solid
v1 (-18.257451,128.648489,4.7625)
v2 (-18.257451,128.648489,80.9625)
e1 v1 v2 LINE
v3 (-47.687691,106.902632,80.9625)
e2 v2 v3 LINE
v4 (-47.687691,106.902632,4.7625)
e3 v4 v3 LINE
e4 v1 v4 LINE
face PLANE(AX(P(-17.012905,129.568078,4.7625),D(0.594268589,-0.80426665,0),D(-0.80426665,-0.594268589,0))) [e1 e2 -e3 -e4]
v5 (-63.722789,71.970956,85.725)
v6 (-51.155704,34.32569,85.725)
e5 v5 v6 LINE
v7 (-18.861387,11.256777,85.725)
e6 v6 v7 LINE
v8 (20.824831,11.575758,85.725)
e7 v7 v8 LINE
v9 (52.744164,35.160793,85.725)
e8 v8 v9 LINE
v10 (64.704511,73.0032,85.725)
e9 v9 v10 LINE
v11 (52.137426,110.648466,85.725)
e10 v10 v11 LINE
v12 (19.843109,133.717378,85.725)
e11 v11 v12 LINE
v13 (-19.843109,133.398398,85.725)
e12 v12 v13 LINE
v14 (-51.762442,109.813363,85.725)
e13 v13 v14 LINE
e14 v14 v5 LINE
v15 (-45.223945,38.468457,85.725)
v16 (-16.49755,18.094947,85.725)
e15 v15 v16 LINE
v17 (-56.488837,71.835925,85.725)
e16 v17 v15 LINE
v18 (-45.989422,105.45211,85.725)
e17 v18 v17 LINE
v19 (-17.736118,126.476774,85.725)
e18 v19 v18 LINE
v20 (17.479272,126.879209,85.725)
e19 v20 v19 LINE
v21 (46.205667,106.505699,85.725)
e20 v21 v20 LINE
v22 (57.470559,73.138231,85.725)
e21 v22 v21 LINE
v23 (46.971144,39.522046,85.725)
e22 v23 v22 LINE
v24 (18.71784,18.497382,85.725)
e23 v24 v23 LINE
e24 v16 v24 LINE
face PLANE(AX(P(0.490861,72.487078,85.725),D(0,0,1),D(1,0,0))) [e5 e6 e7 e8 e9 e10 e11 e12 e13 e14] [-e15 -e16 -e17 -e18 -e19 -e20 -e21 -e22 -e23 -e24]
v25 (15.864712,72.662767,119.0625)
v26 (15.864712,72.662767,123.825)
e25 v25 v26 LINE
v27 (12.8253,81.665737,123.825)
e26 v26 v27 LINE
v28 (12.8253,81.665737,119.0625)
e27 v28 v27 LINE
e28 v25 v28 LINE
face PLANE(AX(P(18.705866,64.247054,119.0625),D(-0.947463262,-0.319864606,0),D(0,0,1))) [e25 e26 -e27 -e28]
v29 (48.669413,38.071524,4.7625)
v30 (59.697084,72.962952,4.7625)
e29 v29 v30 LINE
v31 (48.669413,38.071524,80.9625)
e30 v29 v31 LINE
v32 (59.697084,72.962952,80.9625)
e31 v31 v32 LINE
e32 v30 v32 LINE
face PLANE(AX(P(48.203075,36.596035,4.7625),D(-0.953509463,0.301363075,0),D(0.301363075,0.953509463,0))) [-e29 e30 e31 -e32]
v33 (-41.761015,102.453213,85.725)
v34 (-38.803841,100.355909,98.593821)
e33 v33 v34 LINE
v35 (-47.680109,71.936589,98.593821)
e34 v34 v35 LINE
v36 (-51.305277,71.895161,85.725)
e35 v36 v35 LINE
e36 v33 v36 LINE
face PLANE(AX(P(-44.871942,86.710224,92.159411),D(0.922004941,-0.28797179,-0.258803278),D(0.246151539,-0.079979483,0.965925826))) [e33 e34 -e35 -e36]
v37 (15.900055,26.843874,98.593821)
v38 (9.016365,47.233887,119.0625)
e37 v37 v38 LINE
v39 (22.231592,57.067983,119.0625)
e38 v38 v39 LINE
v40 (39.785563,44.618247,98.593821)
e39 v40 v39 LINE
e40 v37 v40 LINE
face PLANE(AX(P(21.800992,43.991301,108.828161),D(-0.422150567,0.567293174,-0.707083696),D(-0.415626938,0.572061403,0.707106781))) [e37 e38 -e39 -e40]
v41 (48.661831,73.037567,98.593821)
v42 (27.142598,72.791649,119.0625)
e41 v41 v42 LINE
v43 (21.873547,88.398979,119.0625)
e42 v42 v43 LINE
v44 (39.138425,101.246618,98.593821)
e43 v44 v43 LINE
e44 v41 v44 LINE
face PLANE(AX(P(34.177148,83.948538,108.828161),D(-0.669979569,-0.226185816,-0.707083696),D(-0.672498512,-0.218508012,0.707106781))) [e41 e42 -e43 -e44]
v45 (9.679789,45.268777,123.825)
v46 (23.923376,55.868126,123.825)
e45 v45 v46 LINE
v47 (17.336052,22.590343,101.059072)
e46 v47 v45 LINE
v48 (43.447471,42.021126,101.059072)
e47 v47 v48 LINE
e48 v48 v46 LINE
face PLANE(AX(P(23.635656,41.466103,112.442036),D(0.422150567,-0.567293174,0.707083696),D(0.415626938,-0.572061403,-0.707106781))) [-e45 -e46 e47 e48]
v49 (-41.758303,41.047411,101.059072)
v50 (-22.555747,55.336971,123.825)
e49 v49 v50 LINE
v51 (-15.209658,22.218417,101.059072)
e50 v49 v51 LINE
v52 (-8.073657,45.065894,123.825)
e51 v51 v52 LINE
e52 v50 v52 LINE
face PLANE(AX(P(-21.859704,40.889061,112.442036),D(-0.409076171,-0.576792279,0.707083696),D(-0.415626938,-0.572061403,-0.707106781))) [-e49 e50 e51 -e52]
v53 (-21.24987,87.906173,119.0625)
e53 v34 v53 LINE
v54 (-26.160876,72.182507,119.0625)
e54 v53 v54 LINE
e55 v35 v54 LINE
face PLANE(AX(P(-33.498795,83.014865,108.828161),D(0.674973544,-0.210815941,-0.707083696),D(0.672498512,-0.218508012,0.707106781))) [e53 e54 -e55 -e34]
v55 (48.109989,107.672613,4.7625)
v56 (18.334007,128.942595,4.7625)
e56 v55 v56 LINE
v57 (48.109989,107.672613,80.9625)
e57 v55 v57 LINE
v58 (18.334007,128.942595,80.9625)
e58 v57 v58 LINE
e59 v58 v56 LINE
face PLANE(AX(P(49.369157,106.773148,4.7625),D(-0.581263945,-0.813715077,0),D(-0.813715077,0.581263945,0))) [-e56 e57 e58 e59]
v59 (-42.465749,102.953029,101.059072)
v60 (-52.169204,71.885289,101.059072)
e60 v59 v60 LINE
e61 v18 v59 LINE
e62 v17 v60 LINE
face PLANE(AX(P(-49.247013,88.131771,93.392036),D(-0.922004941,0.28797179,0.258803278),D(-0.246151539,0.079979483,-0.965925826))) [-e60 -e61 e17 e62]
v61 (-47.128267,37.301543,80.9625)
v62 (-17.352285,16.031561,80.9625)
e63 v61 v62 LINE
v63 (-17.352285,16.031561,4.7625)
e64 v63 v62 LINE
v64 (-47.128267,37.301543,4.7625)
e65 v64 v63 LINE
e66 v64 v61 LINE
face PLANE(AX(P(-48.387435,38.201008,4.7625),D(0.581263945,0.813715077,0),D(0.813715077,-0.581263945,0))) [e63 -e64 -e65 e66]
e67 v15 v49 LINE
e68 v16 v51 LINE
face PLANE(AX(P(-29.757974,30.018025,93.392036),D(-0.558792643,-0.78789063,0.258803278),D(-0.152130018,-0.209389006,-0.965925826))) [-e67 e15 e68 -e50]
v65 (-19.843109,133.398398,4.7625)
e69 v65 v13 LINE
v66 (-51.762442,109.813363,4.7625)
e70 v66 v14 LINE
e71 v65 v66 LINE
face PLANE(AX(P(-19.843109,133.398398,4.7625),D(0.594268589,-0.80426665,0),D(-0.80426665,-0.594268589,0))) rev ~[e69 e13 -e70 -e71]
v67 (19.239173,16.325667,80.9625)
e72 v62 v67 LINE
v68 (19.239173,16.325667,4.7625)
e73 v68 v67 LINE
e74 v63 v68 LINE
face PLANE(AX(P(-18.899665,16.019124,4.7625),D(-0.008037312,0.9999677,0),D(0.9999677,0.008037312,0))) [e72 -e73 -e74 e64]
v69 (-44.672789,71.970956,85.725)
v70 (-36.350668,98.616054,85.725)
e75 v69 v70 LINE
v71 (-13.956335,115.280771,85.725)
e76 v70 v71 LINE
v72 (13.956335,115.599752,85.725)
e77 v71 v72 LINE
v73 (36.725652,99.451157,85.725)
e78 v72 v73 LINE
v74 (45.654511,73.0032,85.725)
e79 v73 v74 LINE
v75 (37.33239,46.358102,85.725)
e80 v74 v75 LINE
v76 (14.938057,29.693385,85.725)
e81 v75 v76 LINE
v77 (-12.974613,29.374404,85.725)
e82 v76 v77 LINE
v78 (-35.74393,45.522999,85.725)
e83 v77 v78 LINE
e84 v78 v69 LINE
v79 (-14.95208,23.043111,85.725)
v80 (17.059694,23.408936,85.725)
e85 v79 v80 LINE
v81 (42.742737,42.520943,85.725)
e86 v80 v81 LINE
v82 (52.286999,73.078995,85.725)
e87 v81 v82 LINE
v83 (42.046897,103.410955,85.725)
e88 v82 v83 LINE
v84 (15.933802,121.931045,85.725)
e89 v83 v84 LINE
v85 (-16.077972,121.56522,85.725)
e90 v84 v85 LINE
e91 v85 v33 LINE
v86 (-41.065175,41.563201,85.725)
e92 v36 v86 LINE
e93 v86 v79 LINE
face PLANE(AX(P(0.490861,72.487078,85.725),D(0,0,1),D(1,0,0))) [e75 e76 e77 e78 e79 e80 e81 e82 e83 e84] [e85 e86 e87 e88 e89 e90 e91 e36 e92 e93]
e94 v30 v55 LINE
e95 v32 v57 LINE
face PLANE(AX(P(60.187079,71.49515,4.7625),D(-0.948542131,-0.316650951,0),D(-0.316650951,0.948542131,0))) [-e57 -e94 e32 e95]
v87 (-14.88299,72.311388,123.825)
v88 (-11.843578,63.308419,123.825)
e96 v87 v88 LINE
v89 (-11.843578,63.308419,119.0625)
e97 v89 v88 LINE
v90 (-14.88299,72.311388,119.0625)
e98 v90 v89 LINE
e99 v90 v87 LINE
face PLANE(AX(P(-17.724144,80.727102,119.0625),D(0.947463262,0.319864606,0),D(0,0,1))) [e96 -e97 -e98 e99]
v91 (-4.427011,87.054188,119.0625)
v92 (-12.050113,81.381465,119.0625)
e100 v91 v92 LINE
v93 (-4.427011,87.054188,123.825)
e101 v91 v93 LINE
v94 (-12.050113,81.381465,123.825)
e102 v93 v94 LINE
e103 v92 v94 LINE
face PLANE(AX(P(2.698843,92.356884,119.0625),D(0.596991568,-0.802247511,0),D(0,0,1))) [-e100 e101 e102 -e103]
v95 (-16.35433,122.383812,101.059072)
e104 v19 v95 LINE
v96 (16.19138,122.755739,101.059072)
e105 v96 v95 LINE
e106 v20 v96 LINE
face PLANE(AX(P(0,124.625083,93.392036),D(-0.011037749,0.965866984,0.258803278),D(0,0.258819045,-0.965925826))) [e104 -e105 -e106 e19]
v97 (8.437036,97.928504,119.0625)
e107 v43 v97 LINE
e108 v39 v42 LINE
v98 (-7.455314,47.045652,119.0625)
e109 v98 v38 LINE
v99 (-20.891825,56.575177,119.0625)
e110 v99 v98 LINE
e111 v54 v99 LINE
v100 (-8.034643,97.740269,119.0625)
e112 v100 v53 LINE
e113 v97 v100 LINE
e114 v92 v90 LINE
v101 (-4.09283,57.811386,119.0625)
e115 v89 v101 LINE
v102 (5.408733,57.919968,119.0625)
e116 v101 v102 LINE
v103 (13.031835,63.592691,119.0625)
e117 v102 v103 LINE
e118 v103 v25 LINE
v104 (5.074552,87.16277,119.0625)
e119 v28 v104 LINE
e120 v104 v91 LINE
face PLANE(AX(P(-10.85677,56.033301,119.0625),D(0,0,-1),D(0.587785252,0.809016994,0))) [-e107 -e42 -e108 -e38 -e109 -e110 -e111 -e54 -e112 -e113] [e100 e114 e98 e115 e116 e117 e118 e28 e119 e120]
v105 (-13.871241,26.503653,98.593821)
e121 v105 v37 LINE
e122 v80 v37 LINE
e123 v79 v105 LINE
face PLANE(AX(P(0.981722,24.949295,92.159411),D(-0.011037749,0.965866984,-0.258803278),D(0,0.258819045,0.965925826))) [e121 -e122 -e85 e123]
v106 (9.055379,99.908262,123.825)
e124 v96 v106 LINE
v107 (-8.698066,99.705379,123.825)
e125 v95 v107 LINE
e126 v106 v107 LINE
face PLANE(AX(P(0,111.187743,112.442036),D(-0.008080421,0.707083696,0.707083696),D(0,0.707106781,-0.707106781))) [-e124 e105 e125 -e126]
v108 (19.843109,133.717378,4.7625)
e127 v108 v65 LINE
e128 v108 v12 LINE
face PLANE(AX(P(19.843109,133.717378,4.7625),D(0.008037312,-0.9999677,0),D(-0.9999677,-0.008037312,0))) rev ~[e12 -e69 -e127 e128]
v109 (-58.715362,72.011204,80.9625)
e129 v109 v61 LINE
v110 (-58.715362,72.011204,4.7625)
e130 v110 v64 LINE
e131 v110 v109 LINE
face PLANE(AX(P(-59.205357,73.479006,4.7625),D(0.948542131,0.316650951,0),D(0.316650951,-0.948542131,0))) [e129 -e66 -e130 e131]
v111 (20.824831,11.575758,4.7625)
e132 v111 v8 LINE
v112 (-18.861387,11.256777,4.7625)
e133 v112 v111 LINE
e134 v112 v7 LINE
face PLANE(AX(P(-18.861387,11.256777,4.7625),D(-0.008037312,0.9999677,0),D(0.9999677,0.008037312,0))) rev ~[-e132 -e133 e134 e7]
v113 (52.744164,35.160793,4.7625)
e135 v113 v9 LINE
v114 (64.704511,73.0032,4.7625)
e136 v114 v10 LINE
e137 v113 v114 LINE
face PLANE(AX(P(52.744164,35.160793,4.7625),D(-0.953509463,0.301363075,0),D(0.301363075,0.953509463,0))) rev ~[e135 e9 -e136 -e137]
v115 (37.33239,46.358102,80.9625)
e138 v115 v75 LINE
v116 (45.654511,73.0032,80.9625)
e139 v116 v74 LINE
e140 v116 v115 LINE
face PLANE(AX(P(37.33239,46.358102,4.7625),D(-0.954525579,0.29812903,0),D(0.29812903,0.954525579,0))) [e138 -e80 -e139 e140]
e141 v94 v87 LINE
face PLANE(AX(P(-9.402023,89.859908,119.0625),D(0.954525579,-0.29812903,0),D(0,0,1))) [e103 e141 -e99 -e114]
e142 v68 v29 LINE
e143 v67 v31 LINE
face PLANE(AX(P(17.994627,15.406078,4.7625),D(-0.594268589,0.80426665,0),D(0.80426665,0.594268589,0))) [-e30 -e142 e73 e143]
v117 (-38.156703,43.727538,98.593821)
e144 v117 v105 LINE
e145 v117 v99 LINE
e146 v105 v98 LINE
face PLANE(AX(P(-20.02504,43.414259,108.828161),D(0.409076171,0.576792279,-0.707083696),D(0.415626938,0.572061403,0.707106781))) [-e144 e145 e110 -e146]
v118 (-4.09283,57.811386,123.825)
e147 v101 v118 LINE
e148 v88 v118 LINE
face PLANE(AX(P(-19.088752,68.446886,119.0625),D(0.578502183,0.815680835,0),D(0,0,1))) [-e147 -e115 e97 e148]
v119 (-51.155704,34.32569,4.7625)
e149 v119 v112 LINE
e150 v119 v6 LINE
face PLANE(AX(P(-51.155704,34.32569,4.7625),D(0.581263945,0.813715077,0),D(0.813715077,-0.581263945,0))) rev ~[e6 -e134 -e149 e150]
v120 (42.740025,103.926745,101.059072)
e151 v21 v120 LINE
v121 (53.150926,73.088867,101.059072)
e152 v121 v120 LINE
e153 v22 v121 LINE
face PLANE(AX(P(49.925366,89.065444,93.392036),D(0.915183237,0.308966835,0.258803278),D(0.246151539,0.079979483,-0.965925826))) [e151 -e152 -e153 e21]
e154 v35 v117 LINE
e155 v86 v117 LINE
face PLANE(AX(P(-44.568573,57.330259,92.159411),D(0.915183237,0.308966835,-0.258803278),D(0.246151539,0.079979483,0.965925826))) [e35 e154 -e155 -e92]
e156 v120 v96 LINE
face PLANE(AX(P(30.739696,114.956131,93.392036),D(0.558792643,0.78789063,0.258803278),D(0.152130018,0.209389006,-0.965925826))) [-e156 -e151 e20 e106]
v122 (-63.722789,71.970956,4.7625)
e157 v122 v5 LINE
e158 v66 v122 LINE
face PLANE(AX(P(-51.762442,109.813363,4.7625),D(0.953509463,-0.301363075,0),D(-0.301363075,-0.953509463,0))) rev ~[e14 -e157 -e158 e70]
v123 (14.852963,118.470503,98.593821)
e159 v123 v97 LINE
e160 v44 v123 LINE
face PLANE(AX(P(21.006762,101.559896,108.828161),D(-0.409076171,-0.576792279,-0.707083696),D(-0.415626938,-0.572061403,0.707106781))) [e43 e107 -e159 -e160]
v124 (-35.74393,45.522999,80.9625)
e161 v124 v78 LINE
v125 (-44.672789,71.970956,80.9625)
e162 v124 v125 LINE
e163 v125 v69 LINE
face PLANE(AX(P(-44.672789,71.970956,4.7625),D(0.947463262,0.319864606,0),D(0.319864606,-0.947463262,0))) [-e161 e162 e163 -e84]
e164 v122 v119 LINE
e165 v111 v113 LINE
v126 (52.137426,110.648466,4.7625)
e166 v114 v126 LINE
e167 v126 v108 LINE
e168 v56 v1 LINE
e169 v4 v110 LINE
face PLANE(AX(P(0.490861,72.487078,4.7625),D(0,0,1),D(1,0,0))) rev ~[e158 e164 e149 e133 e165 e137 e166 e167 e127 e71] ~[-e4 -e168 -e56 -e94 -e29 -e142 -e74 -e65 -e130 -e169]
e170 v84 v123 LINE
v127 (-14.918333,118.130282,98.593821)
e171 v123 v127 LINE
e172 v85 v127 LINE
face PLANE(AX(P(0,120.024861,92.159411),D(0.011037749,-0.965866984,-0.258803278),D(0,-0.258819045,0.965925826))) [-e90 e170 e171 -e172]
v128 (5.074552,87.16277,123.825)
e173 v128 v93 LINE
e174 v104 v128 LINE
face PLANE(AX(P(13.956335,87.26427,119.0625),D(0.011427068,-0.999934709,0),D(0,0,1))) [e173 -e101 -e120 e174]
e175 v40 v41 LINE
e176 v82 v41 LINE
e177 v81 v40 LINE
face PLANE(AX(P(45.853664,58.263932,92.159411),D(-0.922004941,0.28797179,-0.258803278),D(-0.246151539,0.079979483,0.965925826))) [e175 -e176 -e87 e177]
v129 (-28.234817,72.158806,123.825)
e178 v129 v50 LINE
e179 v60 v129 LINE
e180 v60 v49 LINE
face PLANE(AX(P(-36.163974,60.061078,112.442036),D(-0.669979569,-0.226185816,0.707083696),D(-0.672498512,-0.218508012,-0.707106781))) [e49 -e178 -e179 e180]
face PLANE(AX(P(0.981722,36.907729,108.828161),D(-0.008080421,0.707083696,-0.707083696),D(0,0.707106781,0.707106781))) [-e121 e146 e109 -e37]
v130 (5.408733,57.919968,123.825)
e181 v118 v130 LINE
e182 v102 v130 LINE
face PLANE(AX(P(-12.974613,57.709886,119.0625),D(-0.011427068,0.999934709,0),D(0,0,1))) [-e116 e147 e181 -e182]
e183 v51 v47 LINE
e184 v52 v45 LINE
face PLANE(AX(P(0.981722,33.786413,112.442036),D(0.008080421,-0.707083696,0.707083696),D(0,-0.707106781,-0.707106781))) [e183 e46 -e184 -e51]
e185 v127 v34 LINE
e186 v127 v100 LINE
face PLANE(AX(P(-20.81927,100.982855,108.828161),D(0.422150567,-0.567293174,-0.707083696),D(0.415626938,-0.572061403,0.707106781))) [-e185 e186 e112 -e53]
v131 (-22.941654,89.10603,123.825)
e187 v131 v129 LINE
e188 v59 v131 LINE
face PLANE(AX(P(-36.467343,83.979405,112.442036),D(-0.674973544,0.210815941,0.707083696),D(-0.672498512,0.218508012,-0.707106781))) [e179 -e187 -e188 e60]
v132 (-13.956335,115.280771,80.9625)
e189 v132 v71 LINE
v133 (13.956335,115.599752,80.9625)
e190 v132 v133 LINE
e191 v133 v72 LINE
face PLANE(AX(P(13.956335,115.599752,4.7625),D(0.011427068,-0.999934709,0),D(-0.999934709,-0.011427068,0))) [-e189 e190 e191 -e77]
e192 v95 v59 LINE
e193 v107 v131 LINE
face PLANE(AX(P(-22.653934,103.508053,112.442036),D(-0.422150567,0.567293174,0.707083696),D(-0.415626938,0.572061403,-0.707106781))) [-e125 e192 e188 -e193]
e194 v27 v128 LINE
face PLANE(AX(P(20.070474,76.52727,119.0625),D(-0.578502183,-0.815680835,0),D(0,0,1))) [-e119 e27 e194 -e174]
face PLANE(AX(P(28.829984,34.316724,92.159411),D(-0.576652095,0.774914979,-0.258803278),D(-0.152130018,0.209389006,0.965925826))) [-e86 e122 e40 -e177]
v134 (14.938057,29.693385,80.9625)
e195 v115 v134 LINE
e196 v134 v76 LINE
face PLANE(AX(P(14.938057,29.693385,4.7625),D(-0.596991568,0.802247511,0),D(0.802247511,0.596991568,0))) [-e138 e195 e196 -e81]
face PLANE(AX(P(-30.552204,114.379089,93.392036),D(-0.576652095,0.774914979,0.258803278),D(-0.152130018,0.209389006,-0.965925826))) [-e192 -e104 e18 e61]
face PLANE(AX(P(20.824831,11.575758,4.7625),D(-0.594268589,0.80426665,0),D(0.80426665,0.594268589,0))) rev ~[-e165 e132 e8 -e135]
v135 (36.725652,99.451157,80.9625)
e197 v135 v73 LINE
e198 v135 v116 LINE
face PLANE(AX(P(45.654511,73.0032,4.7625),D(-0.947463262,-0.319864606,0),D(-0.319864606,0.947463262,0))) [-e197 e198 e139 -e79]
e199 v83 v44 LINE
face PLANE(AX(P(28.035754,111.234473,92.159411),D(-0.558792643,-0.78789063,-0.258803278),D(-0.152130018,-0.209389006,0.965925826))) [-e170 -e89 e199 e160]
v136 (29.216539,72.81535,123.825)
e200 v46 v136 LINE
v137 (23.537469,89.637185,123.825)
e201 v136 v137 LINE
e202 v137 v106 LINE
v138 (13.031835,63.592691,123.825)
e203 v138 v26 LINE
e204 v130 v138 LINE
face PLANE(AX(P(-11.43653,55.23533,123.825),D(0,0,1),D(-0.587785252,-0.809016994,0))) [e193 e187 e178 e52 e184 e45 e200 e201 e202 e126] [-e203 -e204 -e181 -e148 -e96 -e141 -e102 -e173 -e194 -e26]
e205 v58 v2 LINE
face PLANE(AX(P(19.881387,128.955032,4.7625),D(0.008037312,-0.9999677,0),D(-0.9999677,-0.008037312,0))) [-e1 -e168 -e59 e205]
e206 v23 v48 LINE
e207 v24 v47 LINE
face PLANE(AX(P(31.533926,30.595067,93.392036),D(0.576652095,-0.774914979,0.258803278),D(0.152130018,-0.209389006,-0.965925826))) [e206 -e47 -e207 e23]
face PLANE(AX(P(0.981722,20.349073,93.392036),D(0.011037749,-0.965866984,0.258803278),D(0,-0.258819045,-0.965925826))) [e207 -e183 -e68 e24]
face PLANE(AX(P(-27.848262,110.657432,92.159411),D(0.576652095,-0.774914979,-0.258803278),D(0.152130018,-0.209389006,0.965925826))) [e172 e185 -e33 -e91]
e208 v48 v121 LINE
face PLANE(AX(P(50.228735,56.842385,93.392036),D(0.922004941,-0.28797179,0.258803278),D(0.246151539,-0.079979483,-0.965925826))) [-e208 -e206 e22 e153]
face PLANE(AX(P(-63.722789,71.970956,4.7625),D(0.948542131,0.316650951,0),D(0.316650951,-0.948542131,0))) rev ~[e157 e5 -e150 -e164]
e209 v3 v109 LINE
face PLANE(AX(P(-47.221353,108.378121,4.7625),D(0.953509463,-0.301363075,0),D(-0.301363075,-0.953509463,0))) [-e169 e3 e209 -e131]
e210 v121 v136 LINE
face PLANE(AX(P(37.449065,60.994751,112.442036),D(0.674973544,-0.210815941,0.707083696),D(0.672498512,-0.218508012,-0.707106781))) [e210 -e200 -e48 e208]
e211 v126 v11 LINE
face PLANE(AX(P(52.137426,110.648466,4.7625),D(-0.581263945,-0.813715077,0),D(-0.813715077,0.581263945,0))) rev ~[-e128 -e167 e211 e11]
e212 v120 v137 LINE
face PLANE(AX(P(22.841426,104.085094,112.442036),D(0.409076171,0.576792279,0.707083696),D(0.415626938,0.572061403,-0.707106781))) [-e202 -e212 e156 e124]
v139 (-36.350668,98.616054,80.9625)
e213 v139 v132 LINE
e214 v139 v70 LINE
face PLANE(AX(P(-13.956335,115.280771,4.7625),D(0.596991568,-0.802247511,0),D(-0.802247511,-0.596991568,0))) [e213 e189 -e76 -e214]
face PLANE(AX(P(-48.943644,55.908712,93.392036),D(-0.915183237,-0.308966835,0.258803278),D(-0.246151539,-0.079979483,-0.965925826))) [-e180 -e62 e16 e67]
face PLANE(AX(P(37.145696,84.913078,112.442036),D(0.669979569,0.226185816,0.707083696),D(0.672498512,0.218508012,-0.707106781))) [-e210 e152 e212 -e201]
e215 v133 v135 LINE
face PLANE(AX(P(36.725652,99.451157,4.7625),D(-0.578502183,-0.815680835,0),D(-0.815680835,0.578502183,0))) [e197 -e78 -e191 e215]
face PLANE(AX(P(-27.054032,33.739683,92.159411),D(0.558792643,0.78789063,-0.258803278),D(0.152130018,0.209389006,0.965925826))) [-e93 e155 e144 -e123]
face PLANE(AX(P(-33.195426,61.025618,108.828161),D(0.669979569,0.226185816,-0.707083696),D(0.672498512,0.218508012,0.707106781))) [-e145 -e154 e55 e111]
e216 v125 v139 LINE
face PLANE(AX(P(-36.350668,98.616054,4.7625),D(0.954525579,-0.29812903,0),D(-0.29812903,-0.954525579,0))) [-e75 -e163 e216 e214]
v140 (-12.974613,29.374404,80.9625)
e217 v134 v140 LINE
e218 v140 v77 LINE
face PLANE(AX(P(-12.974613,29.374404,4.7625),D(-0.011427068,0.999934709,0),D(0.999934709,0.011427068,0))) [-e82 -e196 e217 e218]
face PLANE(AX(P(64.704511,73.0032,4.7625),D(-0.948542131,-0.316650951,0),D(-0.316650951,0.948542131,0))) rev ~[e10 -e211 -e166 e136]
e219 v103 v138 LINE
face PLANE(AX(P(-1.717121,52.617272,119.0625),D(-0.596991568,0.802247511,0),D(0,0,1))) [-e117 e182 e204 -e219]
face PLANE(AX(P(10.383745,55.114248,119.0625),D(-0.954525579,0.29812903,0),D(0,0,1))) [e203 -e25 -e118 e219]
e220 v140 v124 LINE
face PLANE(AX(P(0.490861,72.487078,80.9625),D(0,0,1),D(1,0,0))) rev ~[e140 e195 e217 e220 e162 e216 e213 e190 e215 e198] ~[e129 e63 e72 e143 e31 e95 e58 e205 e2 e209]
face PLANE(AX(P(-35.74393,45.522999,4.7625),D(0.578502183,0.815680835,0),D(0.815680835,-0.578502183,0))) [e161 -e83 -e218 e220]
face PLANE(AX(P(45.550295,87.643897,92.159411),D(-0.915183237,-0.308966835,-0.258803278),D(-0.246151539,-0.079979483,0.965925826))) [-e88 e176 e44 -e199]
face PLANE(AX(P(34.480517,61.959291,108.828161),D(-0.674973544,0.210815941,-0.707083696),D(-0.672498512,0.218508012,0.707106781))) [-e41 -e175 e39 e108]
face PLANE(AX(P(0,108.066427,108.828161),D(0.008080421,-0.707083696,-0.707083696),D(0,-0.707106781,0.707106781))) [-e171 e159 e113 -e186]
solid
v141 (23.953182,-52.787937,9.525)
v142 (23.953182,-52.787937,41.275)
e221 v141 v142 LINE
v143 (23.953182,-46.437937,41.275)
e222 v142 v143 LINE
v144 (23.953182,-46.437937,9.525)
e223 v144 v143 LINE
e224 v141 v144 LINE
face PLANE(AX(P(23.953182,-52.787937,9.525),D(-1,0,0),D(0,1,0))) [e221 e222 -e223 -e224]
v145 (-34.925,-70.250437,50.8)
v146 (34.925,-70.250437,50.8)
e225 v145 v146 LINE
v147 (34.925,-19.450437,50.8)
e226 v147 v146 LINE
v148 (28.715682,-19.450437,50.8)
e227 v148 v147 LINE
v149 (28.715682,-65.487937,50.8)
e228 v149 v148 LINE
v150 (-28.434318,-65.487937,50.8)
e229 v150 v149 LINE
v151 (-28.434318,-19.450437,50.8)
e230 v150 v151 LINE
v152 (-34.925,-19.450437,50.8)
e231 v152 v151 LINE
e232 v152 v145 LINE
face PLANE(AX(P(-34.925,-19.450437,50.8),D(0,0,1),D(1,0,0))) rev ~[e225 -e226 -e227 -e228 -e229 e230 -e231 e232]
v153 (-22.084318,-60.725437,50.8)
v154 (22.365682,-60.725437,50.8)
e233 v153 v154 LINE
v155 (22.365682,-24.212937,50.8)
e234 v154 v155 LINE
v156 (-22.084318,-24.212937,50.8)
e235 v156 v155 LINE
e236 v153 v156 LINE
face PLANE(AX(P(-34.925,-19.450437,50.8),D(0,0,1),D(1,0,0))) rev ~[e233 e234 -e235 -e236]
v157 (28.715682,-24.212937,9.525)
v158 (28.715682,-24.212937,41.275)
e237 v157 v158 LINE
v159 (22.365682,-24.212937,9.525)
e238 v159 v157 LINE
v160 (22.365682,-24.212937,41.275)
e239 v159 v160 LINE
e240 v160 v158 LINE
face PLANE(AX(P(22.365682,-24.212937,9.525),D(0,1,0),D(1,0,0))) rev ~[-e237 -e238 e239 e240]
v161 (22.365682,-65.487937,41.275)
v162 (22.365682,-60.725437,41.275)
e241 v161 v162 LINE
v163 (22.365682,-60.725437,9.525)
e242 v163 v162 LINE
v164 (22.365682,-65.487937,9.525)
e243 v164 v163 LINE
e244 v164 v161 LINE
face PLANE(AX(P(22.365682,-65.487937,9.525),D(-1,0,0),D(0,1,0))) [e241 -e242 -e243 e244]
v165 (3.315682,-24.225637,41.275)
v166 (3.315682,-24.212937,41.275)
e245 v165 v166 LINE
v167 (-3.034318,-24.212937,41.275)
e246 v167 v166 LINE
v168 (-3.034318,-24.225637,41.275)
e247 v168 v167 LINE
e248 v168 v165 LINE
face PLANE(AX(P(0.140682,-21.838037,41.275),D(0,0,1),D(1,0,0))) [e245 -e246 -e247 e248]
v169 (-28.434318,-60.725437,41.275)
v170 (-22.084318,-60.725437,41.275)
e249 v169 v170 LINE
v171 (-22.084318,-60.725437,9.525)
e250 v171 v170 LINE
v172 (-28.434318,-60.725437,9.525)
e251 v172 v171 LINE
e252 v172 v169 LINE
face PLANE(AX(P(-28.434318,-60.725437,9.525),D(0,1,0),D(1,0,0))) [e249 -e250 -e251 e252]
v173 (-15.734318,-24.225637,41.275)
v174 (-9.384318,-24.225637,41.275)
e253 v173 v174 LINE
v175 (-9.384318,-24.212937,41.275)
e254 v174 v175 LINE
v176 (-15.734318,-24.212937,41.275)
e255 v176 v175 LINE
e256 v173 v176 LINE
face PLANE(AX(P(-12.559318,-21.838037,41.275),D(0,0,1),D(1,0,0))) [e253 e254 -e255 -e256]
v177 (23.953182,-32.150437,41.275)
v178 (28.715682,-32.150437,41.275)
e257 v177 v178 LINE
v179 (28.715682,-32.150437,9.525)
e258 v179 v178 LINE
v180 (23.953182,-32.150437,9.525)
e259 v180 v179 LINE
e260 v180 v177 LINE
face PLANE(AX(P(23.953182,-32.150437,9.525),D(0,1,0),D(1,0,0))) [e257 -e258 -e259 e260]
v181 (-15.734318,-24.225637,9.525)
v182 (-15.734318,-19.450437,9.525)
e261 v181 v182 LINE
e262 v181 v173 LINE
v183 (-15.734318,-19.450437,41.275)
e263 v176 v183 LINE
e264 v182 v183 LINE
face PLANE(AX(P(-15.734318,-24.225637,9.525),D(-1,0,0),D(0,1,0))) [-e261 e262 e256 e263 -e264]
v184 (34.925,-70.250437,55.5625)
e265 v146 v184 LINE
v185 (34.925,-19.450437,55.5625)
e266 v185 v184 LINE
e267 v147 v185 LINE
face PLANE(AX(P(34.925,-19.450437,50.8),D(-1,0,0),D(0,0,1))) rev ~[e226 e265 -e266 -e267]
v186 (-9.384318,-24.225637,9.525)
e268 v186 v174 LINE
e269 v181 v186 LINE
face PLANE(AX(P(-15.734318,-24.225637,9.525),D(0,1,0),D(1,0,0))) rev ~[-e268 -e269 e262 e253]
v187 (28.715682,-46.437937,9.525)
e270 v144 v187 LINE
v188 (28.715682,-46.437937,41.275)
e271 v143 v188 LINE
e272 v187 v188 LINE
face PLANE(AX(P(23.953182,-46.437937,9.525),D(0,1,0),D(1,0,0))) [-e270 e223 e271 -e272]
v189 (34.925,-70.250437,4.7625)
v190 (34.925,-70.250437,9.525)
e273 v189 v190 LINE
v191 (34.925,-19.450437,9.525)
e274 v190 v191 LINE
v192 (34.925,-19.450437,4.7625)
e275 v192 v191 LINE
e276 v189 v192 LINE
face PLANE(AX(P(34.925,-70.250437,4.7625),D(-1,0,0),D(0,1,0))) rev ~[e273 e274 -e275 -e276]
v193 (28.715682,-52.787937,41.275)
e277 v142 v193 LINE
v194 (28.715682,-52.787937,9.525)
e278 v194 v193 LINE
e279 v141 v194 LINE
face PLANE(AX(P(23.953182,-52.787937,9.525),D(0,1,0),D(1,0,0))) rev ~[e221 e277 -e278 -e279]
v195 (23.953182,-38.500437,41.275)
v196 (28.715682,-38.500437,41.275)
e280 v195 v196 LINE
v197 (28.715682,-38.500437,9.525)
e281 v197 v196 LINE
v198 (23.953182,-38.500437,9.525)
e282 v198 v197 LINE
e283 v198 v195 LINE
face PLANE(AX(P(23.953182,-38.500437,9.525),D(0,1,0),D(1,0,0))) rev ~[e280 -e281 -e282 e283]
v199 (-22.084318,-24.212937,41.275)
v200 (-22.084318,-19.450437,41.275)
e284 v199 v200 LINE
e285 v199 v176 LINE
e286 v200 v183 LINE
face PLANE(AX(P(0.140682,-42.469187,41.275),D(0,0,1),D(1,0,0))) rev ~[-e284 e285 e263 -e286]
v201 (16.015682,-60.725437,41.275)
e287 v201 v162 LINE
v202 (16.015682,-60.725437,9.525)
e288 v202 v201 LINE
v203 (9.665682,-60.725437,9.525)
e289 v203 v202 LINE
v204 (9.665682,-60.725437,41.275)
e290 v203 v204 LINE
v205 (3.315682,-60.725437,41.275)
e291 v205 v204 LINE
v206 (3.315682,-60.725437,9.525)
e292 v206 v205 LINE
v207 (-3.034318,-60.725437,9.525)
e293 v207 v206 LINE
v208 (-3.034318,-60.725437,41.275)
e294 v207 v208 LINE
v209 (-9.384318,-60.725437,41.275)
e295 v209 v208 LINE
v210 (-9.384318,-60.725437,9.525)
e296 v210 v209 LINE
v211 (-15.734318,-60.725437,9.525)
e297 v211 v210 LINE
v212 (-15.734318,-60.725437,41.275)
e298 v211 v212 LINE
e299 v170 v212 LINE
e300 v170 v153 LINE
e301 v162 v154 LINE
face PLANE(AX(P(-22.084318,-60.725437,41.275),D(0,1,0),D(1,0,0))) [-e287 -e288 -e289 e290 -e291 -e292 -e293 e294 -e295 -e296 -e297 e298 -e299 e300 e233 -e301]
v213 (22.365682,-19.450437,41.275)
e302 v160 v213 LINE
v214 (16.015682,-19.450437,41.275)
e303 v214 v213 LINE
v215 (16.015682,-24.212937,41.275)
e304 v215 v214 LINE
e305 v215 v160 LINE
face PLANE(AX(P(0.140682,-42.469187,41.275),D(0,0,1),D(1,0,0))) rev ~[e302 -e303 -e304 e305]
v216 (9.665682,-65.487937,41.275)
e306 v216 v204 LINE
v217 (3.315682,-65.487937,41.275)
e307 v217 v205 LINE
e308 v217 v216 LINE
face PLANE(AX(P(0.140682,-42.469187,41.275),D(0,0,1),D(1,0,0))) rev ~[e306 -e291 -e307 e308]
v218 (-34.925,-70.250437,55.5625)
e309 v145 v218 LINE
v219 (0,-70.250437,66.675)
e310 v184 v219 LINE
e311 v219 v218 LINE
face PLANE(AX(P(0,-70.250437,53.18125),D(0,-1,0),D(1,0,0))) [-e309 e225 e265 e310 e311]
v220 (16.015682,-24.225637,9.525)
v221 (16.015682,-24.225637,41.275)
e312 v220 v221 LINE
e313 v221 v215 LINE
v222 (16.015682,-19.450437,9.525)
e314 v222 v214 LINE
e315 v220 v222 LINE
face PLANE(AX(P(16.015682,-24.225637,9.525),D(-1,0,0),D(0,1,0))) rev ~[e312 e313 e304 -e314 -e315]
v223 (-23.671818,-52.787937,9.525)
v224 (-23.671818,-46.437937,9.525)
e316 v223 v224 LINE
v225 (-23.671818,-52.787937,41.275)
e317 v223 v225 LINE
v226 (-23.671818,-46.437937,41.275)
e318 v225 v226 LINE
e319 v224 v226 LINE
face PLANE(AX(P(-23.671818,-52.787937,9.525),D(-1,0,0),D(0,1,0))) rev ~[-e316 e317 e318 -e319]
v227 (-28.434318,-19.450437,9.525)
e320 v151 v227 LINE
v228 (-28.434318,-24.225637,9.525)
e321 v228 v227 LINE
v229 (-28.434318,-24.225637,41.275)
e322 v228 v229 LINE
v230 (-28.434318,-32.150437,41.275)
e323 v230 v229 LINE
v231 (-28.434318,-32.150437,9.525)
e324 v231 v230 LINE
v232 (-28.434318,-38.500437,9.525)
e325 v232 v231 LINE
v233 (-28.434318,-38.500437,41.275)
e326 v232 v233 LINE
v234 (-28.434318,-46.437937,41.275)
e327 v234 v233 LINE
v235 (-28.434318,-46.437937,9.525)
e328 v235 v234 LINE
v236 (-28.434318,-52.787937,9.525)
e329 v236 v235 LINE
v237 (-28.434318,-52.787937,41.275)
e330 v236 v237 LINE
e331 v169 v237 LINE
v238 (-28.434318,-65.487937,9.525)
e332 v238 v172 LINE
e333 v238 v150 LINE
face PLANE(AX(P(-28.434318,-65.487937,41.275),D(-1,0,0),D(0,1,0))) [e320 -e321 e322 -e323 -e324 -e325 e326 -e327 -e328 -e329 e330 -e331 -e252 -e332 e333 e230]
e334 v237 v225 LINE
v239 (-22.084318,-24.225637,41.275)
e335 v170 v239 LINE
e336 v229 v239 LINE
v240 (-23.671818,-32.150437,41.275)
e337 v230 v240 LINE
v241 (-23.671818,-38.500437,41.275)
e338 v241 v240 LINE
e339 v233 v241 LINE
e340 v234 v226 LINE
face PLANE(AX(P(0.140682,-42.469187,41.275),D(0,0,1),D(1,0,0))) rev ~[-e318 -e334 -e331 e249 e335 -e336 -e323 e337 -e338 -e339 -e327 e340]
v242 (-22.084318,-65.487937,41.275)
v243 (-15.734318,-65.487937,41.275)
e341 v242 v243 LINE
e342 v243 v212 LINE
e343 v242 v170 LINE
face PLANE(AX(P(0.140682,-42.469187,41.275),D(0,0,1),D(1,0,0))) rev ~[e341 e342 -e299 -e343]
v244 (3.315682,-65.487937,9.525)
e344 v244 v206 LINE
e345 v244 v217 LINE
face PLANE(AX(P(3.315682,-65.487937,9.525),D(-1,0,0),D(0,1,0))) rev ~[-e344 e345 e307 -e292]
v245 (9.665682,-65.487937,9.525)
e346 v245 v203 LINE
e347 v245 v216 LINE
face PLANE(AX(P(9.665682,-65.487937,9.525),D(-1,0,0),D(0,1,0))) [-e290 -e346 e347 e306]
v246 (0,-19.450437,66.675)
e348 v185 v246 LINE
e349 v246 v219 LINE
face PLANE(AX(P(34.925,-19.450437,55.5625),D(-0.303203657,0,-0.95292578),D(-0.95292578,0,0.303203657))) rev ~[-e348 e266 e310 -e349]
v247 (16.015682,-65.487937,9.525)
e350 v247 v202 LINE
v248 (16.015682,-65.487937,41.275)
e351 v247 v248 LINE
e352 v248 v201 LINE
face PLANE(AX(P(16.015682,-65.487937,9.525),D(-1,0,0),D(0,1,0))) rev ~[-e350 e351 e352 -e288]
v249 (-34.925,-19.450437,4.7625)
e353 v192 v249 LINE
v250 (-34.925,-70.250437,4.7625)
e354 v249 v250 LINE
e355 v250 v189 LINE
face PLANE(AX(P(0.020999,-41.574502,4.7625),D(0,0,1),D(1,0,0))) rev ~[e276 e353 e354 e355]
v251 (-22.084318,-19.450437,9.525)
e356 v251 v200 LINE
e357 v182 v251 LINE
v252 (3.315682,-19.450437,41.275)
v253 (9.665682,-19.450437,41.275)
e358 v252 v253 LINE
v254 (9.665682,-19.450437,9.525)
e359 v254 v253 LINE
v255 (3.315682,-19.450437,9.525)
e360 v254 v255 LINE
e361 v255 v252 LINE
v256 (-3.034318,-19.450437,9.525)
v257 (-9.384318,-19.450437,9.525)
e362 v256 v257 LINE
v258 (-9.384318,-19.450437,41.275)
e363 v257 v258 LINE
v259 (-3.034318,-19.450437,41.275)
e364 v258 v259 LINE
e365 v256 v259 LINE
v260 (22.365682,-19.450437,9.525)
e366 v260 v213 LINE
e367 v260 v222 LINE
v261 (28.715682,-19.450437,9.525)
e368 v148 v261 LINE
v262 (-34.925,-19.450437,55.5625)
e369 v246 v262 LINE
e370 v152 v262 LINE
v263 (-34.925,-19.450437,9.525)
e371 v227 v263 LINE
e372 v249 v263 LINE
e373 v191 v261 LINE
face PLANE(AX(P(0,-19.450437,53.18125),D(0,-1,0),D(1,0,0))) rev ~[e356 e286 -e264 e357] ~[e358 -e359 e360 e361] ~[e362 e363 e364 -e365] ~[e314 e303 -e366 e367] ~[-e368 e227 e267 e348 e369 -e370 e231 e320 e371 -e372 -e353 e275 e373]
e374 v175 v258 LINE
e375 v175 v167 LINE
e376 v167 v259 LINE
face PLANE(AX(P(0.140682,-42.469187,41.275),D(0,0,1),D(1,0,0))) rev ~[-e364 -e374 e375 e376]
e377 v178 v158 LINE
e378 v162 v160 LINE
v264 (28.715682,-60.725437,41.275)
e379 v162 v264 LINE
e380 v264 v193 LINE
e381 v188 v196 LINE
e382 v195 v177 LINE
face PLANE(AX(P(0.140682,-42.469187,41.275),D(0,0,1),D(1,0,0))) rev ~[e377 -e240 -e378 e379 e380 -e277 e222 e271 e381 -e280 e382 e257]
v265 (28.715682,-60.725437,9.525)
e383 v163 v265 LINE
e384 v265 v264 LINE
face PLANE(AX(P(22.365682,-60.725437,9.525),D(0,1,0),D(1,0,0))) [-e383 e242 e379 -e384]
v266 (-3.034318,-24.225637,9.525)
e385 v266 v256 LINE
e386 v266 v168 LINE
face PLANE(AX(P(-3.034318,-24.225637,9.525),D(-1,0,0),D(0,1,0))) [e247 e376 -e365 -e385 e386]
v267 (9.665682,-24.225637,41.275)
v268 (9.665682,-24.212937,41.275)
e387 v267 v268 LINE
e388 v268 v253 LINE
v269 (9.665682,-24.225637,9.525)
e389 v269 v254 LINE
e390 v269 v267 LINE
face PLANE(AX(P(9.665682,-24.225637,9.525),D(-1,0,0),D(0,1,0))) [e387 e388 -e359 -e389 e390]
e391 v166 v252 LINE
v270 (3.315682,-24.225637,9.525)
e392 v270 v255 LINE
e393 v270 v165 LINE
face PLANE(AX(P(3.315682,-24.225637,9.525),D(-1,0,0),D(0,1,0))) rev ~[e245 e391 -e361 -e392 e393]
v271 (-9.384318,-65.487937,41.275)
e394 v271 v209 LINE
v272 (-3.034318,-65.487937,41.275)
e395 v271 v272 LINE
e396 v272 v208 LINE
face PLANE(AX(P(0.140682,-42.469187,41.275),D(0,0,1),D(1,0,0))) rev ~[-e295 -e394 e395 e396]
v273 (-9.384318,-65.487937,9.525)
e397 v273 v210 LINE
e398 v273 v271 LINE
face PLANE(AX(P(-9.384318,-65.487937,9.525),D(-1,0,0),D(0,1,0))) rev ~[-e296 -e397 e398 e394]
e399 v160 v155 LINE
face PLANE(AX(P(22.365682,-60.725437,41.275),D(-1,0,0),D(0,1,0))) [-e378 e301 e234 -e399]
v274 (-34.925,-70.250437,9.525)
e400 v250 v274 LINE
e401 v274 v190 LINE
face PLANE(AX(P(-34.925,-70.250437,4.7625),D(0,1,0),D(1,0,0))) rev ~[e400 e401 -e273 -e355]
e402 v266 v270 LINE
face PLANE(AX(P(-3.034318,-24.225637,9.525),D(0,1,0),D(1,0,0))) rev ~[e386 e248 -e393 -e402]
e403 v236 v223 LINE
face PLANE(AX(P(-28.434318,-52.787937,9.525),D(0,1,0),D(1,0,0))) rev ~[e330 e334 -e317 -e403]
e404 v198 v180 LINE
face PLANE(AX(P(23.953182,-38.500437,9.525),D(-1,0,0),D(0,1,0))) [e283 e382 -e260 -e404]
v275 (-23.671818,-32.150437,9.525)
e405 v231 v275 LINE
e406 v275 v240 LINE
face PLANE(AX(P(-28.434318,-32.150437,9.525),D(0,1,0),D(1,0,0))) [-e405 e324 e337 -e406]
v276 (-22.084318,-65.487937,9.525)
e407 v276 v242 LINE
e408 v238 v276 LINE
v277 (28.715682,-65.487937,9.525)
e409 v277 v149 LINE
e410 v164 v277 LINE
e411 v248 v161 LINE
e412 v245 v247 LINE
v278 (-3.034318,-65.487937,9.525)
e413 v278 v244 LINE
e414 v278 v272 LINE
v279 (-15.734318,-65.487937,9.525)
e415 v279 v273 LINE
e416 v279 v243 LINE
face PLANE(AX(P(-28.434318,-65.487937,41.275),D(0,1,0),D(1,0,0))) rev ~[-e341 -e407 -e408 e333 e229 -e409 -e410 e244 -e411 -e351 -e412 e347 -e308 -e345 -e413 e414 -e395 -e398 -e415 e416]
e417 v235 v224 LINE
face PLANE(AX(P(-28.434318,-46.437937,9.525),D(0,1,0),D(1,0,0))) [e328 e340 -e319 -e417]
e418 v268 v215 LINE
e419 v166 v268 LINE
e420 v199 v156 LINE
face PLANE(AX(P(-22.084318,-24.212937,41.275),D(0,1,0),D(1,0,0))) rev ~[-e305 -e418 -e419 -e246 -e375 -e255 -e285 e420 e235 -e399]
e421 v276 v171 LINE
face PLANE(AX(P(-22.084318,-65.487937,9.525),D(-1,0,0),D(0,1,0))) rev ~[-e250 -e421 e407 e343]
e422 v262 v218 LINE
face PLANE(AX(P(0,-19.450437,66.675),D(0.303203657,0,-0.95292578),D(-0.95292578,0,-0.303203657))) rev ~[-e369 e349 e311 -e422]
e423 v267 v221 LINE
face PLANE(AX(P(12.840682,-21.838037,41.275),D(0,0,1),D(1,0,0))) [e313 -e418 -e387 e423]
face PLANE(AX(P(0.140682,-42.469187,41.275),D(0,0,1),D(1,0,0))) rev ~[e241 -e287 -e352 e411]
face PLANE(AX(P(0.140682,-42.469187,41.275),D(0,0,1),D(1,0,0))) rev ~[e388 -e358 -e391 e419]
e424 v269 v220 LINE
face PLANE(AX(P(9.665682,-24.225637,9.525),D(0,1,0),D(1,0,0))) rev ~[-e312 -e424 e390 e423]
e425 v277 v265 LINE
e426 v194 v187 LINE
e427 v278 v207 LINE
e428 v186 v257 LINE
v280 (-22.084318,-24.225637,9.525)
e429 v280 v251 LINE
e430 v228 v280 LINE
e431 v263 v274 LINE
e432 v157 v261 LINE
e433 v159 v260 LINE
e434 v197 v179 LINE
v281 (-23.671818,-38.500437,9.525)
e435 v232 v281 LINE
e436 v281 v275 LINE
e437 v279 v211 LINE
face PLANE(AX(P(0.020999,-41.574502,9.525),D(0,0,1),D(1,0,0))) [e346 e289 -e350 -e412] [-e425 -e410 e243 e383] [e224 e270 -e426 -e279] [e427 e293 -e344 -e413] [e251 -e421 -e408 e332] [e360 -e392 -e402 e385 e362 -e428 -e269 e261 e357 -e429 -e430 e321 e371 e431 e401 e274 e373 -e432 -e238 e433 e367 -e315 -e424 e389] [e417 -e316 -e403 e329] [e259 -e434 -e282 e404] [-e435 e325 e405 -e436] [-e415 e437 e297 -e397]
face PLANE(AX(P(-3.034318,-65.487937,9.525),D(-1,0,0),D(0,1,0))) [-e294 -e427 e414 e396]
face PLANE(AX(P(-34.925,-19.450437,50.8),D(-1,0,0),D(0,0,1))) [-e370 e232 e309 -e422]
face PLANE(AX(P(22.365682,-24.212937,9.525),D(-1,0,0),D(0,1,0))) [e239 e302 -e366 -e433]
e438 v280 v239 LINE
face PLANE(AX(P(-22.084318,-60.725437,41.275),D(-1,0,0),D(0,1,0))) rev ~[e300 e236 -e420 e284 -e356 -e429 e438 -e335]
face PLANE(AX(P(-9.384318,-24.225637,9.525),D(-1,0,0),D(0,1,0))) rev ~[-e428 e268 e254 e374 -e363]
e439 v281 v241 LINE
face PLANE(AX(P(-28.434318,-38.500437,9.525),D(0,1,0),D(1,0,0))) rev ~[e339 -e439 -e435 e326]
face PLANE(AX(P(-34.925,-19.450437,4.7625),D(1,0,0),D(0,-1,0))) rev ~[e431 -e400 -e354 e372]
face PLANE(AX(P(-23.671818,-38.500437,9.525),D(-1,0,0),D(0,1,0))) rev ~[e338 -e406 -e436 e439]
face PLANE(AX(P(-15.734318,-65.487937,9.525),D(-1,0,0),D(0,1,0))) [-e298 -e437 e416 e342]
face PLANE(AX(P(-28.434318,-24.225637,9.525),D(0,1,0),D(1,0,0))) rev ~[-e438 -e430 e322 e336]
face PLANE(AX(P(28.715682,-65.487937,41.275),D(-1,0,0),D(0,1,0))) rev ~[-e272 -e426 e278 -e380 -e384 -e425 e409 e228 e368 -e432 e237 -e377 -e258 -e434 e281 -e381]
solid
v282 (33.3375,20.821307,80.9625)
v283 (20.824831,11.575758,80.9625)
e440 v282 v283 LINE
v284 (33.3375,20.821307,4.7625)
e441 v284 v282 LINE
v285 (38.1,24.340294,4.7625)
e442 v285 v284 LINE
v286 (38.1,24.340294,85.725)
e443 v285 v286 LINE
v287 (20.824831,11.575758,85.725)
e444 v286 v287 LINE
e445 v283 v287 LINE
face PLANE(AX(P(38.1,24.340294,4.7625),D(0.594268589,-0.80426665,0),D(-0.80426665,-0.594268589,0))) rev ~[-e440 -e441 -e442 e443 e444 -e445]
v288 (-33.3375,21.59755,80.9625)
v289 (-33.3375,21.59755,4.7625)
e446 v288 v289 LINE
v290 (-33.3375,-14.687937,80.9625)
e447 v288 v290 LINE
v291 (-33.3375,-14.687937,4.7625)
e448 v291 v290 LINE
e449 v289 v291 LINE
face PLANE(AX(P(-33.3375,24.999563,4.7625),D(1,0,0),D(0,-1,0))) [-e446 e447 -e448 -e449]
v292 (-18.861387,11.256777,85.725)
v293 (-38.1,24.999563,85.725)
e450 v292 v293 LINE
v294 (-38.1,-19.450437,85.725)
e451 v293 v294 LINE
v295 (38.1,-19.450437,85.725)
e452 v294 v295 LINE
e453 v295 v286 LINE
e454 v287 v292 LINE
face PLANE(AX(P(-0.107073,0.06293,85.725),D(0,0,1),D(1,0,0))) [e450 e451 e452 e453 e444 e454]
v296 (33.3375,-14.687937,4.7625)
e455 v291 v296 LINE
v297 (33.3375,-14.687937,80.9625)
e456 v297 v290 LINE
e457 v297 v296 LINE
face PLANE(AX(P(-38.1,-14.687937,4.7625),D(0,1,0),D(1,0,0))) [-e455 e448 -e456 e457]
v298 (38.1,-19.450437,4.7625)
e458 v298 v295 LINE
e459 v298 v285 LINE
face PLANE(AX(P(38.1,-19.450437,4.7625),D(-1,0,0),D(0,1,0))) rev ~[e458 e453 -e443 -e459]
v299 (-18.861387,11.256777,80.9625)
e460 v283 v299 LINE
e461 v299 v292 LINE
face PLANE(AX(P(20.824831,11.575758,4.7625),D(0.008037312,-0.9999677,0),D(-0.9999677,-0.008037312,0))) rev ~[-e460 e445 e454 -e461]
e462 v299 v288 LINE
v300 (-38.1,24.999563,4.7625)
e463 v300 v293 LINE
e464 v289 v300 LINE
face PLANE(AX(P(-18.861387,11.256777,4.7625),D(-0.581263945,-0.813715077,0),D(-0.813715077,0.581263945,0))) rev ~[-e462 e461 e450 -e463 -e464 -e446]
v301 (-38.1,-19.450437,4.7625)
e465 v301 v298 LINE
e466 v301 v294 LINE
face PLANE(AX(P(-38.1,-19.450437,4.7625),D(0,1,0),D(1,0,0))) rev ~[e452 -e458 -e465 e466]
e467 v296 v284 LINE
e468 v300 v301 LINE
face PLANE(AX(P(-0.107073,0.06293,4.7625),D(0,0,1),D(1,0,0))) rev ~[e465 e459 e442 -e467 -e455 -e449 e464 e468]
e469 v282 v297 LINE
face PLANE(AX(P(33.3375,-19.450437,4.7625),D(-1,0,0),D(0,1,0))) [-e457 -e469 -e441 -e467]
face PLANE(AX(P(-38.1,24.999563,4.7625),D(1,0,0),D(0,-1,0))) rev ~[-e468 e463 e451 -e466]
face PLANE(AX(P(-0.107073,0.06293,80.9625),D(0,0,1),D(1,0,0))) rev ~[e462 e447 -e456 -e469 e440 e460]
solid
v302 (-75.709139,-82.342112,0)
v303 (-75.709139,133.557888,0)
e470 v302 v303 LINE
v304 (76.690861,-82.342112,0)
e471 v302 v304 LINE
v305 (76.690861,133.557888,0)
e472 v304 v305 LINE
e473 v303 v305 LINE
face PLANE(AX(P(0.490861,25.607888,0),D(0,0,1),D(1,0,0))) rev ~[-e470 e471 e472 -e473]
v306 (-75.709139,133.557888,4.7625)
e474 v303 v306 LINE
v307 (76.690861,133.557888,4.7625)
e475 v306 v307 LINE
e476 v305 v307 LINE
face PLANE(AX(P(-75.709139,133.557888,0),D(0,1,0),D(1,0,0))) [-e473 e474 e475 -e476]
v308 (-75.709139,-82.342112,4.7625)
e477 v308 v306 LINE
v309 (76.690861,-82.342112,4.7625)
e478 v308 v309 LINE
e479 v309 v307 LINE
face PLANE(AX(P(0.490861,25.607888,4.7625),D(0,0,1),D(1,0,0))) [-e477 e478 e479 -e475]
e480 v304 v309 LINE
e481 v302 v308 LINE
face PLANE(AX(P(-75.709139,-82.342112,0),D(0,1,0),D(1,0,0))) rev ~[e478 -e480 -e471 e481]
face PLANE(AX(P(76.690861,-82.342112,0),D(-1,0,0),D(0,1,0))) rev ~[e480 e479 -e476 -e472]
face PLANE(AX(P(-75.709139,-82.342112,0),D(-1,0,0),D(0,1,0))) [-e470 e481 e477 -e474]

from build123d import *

# Parameters (mm, degrees)
F0_W      = 152.4
F0_H      = 215.9
F1_DEPTH  = 4.7625
F3_DEPTH  = 80.9625
F4_T      = -4.7625
F5_DEPTH  = 80.9635
F7_DEPTH  = 80.9625
F8_T      = -4.7625
F9_W      = 6.35
F9_H      = 4.7625
F9_W_2    = 4.7625
F9_H_2    = 6.35
F9_H_3    = 4.7752
F10_DEPTH = 4.7625
F11_W     = 6.35
F11_H     = 4.7752
F11_H_2   = 4.7625
F11_W_2   = 4.7625
F11_H_3   = 6.35
F12_DEPTH = 31.75
F15_W     = 57.15
F15_H     = 46.0375
F15_W_2   = 44.45
F15_H_2   = 36.5125
F16_DEPTH = 9.525
F17_W     = 69.85
F17_H     = 4.7625
F18_DEPTH = 50.8


# Not quite as in the source:
# - a feature names something its author has since deleted; it is built from what else it names


with BuildPart() as f1:
    # F0 (on Top) → F1 (new body)
    with BuildSketch(Plane.XY):
        with Locations((0.4908610135, 25.6078880154)):
            Rectangle(F0_W, F0_H)
    extrude(amount=F1_DEPTH)


with BuildPart() as f3:
    # F2 (on face) → F3 (new body)
    with BuildSketch(Plane.XY.offset(4.7625)):
        Polygon((19.8431090525, 133.7173784268), (-19.8431090525, 133.398397604), (-51.7624417186, 109.813362976), (-63.7227887654, 71.970956145), (-51.1557041384, 34.3256903041), (-18.8613870255, 11.2567774892), (20.8248310796, 11.5757583121), (52.7441637457, 35.16079294), (64.7045107925, 73.0031997711), (52.1374261654, 110.6484656119), align=None)
        Polygon((-36.3506679758, 98.6160539199), (-13.9563353097, 115.2807709686), (13.9563353097, 115.5997517914), (36.7256524226, 99.4511565558), (45.6545107925, 73.0031997711), (37.3323900028, 46.3581019962), (14.9380573368, 29.6933849475), (-12.9746132826, 29.3744041247), (-35.7439303955, 45.5229993603), (-44.6727887654, 71.970956145), align=None, mode=Mode.SUBTRACT)
        Polygon((13.9563353097, 115.5997517914), (-13.9563353097, 115.2807709686), (-36.3506679758, 98.6160539199), (-44.6727887654, 71.970956145), (-35.7439303955, 45.5229993603), (-12.9746132826, 29.3744041247), (14.9380573368, 29.6933849475), (37.3323900028, 46.3581019962), (45.6545107925, 73.0031997711), (36.7256524226, 99.4511565558), align=None)
    extrude(amount=F3_DEPTH)

    # F4
    f4_openings = [f3.faces().sort_by_distance(p)[0] for p in [
        (0.490861, 72.487078, 4.7625),
    ]]
    offset(amount=F4_T, openings=f4_openings)

    # F2 (on face) → F5 (cut, through all)
    with BuildSketch(Plane.XY.offset(4.7625)):
        Polygon((13.9563353097, 115.5997517914), (-13.9563353097, 115.2807709686), (-36.3506679758, 98.6160539199), (-44.6727887654, 71.970956145), (-35.7439303955, 45.5229993603), (-12.9746132826, 29.3744041247), (14.9380573368, 29.6933849475), (37.3323900028, 46.3581019962), (45.6545107925, 73.0031997711), (36.7256524226, 99.4511565558), align=None)
    extrude(amount=F5_DEPTH, mode=Mode.SUBTRACT)

    # F20: sweep along a path in F20_path
    with BuildLine(Plane(origin=(-35.7439303955, 45.5229993603, 85.725), x_dir=(0, -1, 0), z_dir=(0, 0, -1))) as f20_path:
        Line((0, 0), (16.1485952356, -22.7693171129))
        Line((16.1485952356, -22.7693171129), (15.8296144128, -50.6819877323))
        Line((15.8296144128, -50.6819877323), (-0.8351026359, -73.0763203984))
        Line((-0.8351026359, -73.0763203984), (-27.4802004108, -81.398441188))
        Line((-27.4802004108, -81.398441188), (-53.9281571955, -72.4695828181))
        Line((-53.9281571955, -72.4695828181), (-70.0767524311, -49.7002657052))
        Line((-70.0767524311, -49.7002657052), (-69.7577716083, -21.7875950858))
        Line((-69.7577716083, -21.7875950858), (-53.0930545596, 0.6067375802))
        Line((-53.0930545596, 0.6067375802), (-26.4479567847, 8.9288583699))
        Line((-26.4479567847, 8.9288583699), (0, 0))
    # F19 (on Right) → F20 (sweep)
    with BuildSketch(Plane.YZ):
        Polygon((22.392230299, 101.0590724923), (18.283477958, 85.725), (23.2139807672, 85.725), (26.6621709852, 98.5938210877), (47.1308498975, 119.0625), (57.8581578067, 119.0625), (57.8581578067, 123.825), (45.1581578067, 123.825), align=None)
    sweep(path=f20_path.line, transition=Transition.RIGHT)


with BuildPart() as f7:
    # F6 (on face) → F7 (new body)
    with BuildSketch(Plane.XY.offset(4.7625)):
        Polygon((-38.1, -19.4504366256), (38.1, -19.4504366256), (38.1, 24.3402938822), (20.8248310796, 11.5757583121), (-18.8613870255, 11.2567774892), (-38.1, 24.9995633744), align=None)
    extrude(amount=F7_DEPTH)

    # F8
    f8_openings = [f7.faces().sort_by_distance(p)[0] for p in [
        (-0.159074, -2.163387, 4.7625),
        (0.981722, 11.416268, 45.24375),
        (-28.480694, 18.12817, 45.24375),
        (29.462416, 17.958026, 45.24375),
    ]]
    offset(amount=F8_T, openings=f8_openings)


with BuildPart() as f10:
    # F9 (on face) → F10 (new body)
    with BuildSketch(Plane.XY.offset(4.7625)):
        Polygon((-34.925, -70.2504366256), (34.925, -70.2504366256), (34.925, -19.4504366256), (28.715682441, -19.4504366256), (28.715682441, -24.2129366256), (22.365682441, -24.2129366256), (22.365682441, -19.4504366256), (16.015682441, -19.4504366256), (16.015682441, -24.2256366256), (9.665682441, -24.2256366256), (9.665682441, -19.4504366256), (3.315682441, -19.4504366256), (3.315682441, -24.2256366256), (-3.034317559, -24.2256366256), (-3.034317559, -19.4504366256), (-9.384317559, -19.4504366256), (-9.384317559, -24.2256366256), (-15.734317559, -24.2256366256), (-15.734317559, -19.4504366256), (-22.084317559, -19.4504366256), (-22.084317559, -24.2256366256), (-28.434317559, -24.2256366256), (-28.434317559, -19.4504366256), (-34.925, -19.4504366256), align=None)
        with Locations((-25.259317559, -63.1066866256)):
            Rectangle(F9_W, F9_H, mode=Mode.SUBTRACT)
        with Locations((-12.559317559, -63.1066866256)):
            Rectangle(F9_W, F9_H, mode=Mode.SUBTRACT)
        with Locations((0.140682441, -63.1066866256)):
            Rectangle(F9_W, F9_H, mode=Mode.SUBTRACT)
        with Locations((-26.053067559, -49.6129366256)):
            Rectangle(F9_W_2, F9_H_2, mode=Mode.SUBTRACT)
        with Locations((-26.053067559, -35.3254366256)):
            Rectangle(F9_W_2, F9_H_2, mode=Mode.SUBTRACT)
        with Locations((12.840682441, -63.1066866256)):
            Rectangle(F9_W, F9_H, mode=Mode.SUBTRACT)
        with Locations((25.540682441, -63.1066866256)):
            Rectangle(F9_W, F9_H, mode=Mode.SUBTRACT)
        with Locations((26.334432441, -49.6129366256)):
            Rectangle(F9_W_2, F9_H_2, mode=Mode.SUBTRACT)
        with Locations((26.334432441, -35.3254366256)):
            Rectangle(F9_W_2, F9_H_2, mode=Mode.SUBTRACT)
        with Locations((12.840682441, -21.8380366256)):
            Rectangle(F9_W, F9_H_3)
        with Locations((0.140682441, -21.8380366256)):
            Rectangle(F9_W, F9_H_3)
        with Locations((-12.559317559, -21.8380366256)):
            Rectangle(F9_W, F9_H_3)
        with Locations((-25.259317559, -21.8380366256)):
            Rectangle(F9_W, F9_H_3)
        with Locations((25.540682441, -21.8316866256)):
            Rectangle(F9_W, F9_H)
        with Locations((-26.053067559, -49.6129366256)):
            Rectangle(F9_W_2, F9_H_2)
        with Locations((-25.259317559, -63.1066866256)):
            Rectangle(F9_W, F9_H)
        with Locations((-26.053067559, -35.3254366256)):
            Rectangle(F9_W_2, F9_H_2)
        with Locations((-12.559317559, -63.1066866256)):
            Rectangle(F9_W, F9_H)
        with Locations((26.334432441, -35.3254366256)):
            Rectangle(F9_W_2, F9_H_2)
        with Locations((26.334432441, -49.6129366256)):
            Rectangle(F9_W_2, F9_H_2)
        with Locations((25.540682441, -63.1066866256)):
            Rectangle(F9_W, F9_H)
        with Locations((12.840682441, -63.1066866256)):
            Rectangle(F9_W, F9_H)
        with Locations((0.140682441, -63.1066866256)):
            Rectangle(F9_W, F9_H)
    extrude(amount=F10_DEPTH)

    # F11 (on face) → F12 (join)
    with BuildSketch(Plane.XY.offset(9.525)):
        with Locations((-25.259317559, -21.8380366256)):
            Rectangle(F11_W, F11_H)
        with Locations((25.540682441, -21.8316866256)):
            Rectangle(F11_W, F11_H_2)
        with Locations((12.840682441, -21.8380366256)):
            Rectangle(F11_W, F11_H)
        with Locations((0.140682441, -21.8380366256)):
            Rectangle(F11_W, F11_H)
        with Locations((-12.559317559, -21.8380366256)):
            Rectangle(F11_W, F11_H)
        with Locations((-26.053067559, -35.3254366256)):
            Rectangle(F11_W_2, F11_H_3)
        with Locations((-26.053067559, -49.6129366256)):
            Rectangle(F11_W_2, F11_H_3)
        with Locations((-25.259317559, -63.1066866256)):
            Rectangle(F11_W, F11_H_2)
        with Locations((-12.559317559, -63.1066866256)):
            Rectangle(F11_W, F11_H_2)
        with Locations((0.140682441, -63.1066866256)):
            Rectangle(F11_W, F11_H_2)
        with Locations((12.840682441, -63.1066866256)):
            Rectangle(F11_W, F11_H_2)
        with Locations((25.540682441, -63.1066866256)):
            Rectangle(F11_W, F11_H_2)
        with Locations((26.334432441, -49.6129366256)):
            Rectangle(F11_W_2, F11_H_3)
        with Locations((26.334432441, -35.3254366256)):
            Rectangle(F11_W_2, F11_H_3)
    extrude(amount=F12_DEPTH)

    # F15 (on face) → F16 (join)
    with BuildSketch(Plane.XY.offset(41.275)):
        with Locations((0.140682441, -42.4691866256)):
            Rectangle(F15_W, F15_H)
        with Locations((0.140682441, -42.4691866256)):
            Rectangle(F15_W_2, F15_H_2, mode=Mode.SUBTRACT)
    extrude(amount=F16_DEPTH)

    # F17 (on face) → F18 (join)
    with BuildSketch(Plane.XZ.offset(19.4504366256)):
        with Locations((0, 53.18125)):
            Rectangle(F17_W, F17_H)
        Polygon((0, 66.675), (-34.925, 55.5625), (34.925, 55.5625), align=None)
    extrude(amount=F18_DEPTH)


solid = Compound([f1.part, f3.part, f7.part, f10.part])
